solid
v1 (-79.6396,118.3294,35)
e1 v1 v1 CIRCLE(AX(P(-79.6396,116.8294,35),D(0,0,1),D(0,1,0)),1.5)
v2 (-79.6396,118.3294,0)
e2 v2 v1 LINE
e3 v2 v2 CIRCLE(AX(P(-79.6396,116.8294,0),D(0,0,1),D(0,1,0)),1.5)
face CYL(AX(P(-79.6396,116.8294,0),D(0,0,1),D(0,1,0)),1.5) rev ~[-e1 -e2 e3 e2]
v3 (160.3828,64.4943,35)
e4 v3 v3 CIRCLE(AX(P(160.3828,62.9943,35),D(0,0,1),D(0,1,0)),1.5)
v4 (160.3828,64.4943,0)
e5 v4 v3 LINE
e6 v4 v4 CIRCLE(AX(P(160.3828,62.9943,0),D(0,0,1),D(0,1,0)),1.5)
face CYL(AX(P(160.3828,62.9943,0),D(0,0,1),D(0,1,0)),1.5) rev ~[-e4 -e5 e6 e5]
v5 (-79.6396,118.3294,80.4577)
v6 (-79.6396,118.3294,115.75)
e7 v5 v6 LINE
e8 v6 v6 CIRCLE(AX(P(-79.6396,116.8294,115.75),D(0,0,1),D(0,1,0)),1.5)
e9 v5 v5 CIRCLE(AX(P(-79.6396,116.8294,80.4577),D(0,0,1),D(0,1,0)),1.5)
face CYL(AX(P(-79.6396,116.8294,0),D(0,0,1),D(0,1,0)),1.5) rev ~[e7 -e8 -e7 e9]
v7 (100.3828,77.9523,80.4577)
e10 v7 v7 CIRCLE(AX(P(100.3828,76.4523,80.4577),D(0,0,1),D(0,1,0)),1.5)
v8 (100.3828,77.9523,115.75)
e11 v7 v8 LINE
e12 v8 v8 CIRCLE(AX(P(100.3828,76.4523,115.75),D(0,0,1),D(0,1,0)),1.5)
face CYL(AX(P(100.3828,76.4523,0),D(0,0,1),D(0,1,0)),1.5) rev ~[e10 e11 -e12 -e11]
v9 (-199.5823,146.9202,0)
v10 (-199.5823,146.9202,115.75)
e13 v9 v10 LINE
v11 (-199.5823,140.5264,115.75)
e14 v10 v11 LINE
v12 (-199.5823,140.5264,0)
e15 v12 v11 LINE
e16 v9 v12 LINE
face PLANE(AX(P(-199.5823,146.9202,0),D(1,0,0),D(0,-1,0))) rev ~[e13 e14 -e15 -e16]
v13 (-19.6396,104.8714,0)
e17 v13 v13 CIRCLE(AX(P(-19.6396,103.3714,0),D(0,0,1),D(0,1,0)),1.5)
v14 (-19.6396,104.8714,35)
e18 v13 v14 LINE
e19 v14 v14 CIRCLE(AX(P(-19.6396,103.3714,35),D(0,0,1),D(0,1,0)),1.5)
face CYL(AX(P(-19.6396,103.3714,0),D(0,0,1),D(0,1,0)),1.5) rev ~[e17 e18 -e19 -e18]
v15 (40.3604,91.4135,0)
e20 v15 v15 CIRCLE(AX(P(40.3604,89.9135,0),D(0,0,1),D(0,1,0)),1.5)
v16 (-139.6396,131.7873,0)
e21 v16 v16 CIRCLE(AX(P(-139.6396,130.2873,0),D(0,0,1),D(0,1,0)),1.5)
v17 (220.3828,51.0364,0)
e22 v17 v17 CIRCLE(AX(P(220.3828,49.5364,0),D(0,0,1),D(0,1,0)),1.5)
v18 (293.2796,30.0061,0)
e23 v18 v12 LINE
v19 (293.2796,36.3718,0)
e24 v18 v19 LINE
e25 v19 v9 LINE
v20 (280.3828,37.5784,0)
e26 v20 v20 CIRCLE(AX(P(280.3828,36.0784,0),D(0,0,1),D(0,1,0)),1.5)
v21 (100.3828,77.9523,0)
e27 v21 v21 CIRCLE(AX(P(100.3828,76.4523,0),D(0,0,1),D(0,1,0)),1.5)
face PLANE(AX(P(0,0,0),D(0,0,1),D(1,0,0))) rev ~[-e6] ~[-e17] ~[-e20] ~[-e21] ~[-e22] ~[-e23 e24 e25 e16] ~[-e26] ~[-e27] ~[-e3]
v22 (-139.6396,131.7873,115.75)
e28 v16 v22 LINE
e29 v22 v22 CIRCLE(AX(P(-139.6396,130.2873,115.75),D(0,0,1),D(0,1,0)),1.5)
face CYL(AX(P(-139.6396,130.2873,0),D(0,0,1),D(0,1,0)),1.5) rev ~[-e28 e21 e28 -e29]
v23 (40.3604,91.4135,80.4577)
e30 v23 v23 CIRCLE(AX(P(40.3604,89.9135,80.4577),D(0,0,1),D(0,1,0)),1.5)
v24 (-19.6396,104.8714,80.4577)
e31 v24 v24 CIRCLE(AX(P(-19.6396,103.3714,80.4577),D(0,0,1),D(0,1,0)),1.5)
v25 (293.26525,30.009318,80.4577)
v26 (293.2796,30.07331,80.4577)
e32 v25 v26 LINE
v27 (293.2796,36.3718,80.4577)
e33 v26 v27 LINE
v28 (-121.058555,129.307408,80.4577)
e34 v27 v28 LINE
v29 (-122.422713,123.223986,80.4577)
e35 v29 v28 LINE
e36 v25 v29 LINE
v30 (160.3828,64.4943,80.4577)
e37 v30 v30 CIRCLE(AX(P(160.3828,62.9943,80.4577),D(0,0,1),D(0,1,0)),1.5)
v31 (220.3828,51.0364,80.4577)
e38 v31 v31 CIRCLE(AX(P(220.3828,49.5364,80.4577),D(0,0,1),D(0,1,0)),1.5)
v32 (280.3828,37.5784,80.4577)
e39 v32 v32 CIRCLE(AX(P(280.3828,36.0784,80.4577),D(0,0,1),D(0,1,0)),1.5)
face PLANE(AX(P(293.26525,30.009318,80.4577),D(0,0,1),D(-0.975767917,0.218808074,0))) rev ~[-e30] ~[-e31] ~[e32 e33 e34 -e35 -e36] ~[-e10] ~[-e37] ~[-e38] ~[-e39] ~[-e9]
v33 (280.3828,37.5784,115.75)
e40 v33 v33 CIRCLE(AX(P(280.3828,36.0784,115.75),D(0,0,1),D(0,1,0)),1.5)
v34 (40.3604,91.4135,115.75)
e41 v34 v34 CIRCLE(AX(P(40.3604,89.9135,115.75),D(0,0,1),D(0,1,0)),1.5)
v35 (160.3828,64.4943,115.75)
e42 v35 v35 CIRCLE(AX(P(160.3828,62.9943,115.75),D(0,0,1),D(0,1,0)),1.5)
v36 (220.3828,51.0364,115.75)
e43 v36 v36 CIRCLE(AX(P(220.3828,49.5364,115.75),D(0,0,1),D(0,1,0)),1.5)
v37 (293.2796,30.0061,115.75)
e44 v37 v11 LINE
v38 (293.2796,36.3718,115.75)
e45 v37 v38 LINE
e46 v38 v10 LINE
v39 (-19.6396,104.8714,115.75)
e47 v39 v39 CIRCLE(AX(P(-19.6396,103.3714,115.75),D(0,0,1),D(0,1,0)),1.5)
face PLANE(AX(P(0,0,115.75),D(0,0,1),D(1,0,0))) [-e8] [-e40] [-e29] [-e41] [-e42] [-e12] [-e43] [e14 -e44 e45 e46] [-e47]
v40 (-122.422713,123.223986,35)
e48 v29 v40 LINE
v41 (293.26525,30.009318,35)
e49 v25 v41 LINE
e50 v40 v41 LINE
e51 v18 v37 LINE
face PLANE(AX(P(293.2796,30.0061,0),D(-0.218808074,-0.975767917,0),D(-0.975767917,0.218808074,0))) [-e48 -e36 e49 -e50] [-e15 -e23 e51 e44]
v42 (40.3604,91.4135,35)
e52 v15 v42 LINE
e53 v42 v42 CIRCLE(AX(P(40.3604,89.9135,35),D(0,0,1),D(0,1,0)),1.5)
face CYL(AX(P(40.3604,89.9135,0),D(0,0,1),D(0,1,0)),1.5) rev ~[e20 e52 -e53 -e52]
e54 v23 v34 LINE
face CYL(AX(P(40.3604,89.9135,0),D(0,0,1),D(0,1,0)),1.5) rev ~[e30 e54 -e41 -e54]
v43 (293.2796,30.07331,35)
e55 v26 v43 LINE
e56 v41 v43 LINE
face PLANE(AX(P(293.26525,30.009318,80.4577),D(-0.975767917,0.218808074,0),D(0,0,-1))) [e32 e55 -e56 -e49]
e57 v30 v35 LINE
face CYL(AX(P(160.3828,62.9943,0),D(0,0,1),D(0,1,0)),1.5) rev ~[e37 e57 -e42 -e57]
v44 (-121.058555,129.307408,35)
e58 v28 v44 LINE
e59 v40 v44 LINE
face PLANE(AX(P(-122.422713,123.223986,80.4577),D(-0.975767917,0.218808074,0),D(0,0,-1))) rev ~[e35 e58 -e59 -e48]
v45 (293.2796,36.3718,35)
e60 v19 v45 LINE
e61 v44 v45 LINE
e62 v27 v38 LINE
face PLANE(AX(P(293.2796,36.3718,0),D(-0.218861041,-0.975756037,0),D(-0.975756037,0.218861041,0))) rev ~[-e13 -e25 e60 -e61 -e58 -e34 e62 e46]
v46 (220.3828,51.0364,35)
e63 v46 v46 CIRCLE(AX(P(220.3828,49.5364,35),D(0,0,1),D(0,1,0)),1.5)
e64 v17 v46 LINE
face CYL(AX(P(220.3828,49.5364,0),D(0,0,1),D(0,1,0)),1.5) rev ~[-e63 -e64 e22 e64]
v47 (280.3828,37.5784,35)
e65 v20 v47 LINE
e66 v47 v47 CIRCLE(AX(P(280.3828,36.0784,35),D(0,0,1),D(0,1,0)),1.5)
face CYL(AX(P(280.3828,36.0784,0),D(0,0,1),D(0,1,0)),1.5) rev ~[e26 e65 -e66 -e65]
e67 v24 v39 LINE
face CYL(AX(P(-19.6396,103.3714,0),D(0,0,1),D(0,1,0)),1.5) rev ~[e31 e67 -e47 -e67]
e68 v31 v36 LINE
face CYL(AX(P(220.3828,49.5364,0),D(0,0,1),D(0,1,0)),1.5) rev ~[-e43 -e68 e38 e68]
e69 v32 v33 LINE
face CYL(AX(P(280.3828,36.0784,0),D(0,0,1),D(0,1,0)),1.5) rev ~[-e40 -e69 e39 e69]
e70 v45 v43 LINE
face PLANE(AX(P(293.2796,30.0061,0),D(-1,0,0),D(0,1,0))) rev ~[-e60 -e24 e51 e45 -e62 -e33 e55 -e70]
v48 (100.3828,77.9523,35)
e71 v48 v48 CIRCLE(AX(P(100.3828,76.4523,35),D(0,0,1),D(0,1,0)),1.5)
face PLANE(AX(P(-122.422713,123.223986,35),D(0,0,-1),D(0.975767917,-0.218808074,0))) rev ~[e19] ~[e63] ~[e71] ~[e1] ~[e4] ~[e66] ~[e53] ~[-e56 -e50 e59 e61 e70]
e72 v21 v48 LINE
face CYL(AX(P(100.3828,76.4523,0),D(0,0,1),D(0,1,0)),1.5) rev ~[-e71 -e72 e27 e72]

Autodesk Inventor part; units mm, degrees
ref_plane "YZ Plane" through (0, 0, 0) normal (1, 0, 0) x (0, 1, 0)
ref_plane "XZ Plane" through (0, 0, 0) normal (0, 1, 0) x (-1, 0, 0)
sketch "Sketch4" plane through (0, 0, 0) normal (0, 0, 1) x (1, 0, 0)
  line L0 (293.2796, 30.0061) -> (-199.5823, 140.5264)
  line L1 (293.2796, 36.3718) -> (-199.5823, 146.9202)
  line L2 (-199.5823, 146.9202) -> (-199.5823, 140.5264)
  line L3 (293.2796, 30.0061) -> (-199.5823, 140.5264)
  line L4 (293.2796, 36.3718) -> (-199.5823, 146.9202)
  line L5 (-199.5823, 146.9202) -> (-199.5823, 140.5264)
  line L6 (293.2796, 30.0061) -> (293.2796, 36.3718)
sketch "Sketch5" plane through (0, 0, 0) normal (0, 0, 1) x (1, 0, 0)
  circle A0 centre (280.3828, 36.0784) radius 3.5
  circle A1 centre (220.3828, 49.5364) radius 3.5
  circle A2 centre (160.3828, 62.9943) radius 3.5
  circle A3 centre (100.3828, 76.4523) radius 3.5
  circle A4 centre (40.3604, 89.9135) radius 3.5
  circle A5 centre (-139.6396, 130.2873) radius 3.5
  circle A6 centre (-79.6396, 116.8294) radius 3.5
  circle A7 centre (-19.6396, 103.3714) radius 3.5
extrude "Extrusion3" add sketch "Sketch4" along normal blind 115.75
ref_plane "Work Plane3" through (111499.6524, -24907.1137, 0) normal (-0.2188346, -0.975762, 0) x (0, 0, -1)
sketch "Sketch6" plane through (111499.6524, -24907.1137, 0) normal (-0.2188346, -0.975762, 0) x (0, 0, -1)
  line L0 (0, -114474.0796) -> (-115.4577, -114474.0796)
  line L1 (-115.4577, -114474.0796) -> (-115.4577, -113968.0685)
  line L2 (-115.4577, -113968.0685) -> (0, -113968.0685)
  line L3 (0, -113968.0685) -> (0, -114474.0796)
  line L4 (0, -113968.0539) -> (-115.75, -113968.0539) projected
  line L5 (-27.7607, -113968.0539) -> (-91.2309, -113968.0539)
  line L6 (-75.4577, -113983.6101) -> (-36.9803, -113983.6101)
  line L7 (-35, -113968.0685) -> (-80.4577, -113968.0685)
  line L8 (-80.4577, -113968.0685) -> (-80.4577, -114394.0796)
  line L9 (-80.4577, -114394.0796) -> (-35, -114394.0796)
  line L10 (-35, -114394.0796) -> (-35, -113968.0685)
  point P0 (0, -114247.6585)
  dimension "d28" = 506.0111
  dimension "d29" = 115.4577
  dimension "d30" = 35
  dimension "d32" = 80
  dimension "d42" = 35
emboss "Emboss1" sketch "Sketch6" operation cut depth 8 direction (-0.2188346, -0.975762, 0) contours L10 L9 L8 L2
hole "Hole1" at (-139.6396, 130.2873, 0) at (-79.6396, 116.8294, 0) at (-19.6396, 103.3714, 0) at (40.3604, 89.9135, 0) at (100.3828, 76.4523, 0) at (160.3828, 62.9943, 0) at (220.3828, 49.5364, 0) at (280.3828, 36.0784, 0) direction (0, 0, 1) diameter 3 end through all
equation "\"d40\" = Thickness"
equation "\"BendRadius\" = Thickness"
equation "\"BendReliefWidth\" = Thickness"
equation "\"BendReliefDepth\" = 0.5 * Thickness"
equation "\"CornerReliefSize\" = 4 * Thickness"
equation "\"MinimumRemnant\" = 2 * Thickness"
equation "\"TransitionRadius\" = BendRadius"
equation "\"JacobiRadiusSize\" = BendRadius"
equation "\"GapSize\" = Thickness"
equation "\"Thickness\" = 0.5"
properties part number "sidesupport"
